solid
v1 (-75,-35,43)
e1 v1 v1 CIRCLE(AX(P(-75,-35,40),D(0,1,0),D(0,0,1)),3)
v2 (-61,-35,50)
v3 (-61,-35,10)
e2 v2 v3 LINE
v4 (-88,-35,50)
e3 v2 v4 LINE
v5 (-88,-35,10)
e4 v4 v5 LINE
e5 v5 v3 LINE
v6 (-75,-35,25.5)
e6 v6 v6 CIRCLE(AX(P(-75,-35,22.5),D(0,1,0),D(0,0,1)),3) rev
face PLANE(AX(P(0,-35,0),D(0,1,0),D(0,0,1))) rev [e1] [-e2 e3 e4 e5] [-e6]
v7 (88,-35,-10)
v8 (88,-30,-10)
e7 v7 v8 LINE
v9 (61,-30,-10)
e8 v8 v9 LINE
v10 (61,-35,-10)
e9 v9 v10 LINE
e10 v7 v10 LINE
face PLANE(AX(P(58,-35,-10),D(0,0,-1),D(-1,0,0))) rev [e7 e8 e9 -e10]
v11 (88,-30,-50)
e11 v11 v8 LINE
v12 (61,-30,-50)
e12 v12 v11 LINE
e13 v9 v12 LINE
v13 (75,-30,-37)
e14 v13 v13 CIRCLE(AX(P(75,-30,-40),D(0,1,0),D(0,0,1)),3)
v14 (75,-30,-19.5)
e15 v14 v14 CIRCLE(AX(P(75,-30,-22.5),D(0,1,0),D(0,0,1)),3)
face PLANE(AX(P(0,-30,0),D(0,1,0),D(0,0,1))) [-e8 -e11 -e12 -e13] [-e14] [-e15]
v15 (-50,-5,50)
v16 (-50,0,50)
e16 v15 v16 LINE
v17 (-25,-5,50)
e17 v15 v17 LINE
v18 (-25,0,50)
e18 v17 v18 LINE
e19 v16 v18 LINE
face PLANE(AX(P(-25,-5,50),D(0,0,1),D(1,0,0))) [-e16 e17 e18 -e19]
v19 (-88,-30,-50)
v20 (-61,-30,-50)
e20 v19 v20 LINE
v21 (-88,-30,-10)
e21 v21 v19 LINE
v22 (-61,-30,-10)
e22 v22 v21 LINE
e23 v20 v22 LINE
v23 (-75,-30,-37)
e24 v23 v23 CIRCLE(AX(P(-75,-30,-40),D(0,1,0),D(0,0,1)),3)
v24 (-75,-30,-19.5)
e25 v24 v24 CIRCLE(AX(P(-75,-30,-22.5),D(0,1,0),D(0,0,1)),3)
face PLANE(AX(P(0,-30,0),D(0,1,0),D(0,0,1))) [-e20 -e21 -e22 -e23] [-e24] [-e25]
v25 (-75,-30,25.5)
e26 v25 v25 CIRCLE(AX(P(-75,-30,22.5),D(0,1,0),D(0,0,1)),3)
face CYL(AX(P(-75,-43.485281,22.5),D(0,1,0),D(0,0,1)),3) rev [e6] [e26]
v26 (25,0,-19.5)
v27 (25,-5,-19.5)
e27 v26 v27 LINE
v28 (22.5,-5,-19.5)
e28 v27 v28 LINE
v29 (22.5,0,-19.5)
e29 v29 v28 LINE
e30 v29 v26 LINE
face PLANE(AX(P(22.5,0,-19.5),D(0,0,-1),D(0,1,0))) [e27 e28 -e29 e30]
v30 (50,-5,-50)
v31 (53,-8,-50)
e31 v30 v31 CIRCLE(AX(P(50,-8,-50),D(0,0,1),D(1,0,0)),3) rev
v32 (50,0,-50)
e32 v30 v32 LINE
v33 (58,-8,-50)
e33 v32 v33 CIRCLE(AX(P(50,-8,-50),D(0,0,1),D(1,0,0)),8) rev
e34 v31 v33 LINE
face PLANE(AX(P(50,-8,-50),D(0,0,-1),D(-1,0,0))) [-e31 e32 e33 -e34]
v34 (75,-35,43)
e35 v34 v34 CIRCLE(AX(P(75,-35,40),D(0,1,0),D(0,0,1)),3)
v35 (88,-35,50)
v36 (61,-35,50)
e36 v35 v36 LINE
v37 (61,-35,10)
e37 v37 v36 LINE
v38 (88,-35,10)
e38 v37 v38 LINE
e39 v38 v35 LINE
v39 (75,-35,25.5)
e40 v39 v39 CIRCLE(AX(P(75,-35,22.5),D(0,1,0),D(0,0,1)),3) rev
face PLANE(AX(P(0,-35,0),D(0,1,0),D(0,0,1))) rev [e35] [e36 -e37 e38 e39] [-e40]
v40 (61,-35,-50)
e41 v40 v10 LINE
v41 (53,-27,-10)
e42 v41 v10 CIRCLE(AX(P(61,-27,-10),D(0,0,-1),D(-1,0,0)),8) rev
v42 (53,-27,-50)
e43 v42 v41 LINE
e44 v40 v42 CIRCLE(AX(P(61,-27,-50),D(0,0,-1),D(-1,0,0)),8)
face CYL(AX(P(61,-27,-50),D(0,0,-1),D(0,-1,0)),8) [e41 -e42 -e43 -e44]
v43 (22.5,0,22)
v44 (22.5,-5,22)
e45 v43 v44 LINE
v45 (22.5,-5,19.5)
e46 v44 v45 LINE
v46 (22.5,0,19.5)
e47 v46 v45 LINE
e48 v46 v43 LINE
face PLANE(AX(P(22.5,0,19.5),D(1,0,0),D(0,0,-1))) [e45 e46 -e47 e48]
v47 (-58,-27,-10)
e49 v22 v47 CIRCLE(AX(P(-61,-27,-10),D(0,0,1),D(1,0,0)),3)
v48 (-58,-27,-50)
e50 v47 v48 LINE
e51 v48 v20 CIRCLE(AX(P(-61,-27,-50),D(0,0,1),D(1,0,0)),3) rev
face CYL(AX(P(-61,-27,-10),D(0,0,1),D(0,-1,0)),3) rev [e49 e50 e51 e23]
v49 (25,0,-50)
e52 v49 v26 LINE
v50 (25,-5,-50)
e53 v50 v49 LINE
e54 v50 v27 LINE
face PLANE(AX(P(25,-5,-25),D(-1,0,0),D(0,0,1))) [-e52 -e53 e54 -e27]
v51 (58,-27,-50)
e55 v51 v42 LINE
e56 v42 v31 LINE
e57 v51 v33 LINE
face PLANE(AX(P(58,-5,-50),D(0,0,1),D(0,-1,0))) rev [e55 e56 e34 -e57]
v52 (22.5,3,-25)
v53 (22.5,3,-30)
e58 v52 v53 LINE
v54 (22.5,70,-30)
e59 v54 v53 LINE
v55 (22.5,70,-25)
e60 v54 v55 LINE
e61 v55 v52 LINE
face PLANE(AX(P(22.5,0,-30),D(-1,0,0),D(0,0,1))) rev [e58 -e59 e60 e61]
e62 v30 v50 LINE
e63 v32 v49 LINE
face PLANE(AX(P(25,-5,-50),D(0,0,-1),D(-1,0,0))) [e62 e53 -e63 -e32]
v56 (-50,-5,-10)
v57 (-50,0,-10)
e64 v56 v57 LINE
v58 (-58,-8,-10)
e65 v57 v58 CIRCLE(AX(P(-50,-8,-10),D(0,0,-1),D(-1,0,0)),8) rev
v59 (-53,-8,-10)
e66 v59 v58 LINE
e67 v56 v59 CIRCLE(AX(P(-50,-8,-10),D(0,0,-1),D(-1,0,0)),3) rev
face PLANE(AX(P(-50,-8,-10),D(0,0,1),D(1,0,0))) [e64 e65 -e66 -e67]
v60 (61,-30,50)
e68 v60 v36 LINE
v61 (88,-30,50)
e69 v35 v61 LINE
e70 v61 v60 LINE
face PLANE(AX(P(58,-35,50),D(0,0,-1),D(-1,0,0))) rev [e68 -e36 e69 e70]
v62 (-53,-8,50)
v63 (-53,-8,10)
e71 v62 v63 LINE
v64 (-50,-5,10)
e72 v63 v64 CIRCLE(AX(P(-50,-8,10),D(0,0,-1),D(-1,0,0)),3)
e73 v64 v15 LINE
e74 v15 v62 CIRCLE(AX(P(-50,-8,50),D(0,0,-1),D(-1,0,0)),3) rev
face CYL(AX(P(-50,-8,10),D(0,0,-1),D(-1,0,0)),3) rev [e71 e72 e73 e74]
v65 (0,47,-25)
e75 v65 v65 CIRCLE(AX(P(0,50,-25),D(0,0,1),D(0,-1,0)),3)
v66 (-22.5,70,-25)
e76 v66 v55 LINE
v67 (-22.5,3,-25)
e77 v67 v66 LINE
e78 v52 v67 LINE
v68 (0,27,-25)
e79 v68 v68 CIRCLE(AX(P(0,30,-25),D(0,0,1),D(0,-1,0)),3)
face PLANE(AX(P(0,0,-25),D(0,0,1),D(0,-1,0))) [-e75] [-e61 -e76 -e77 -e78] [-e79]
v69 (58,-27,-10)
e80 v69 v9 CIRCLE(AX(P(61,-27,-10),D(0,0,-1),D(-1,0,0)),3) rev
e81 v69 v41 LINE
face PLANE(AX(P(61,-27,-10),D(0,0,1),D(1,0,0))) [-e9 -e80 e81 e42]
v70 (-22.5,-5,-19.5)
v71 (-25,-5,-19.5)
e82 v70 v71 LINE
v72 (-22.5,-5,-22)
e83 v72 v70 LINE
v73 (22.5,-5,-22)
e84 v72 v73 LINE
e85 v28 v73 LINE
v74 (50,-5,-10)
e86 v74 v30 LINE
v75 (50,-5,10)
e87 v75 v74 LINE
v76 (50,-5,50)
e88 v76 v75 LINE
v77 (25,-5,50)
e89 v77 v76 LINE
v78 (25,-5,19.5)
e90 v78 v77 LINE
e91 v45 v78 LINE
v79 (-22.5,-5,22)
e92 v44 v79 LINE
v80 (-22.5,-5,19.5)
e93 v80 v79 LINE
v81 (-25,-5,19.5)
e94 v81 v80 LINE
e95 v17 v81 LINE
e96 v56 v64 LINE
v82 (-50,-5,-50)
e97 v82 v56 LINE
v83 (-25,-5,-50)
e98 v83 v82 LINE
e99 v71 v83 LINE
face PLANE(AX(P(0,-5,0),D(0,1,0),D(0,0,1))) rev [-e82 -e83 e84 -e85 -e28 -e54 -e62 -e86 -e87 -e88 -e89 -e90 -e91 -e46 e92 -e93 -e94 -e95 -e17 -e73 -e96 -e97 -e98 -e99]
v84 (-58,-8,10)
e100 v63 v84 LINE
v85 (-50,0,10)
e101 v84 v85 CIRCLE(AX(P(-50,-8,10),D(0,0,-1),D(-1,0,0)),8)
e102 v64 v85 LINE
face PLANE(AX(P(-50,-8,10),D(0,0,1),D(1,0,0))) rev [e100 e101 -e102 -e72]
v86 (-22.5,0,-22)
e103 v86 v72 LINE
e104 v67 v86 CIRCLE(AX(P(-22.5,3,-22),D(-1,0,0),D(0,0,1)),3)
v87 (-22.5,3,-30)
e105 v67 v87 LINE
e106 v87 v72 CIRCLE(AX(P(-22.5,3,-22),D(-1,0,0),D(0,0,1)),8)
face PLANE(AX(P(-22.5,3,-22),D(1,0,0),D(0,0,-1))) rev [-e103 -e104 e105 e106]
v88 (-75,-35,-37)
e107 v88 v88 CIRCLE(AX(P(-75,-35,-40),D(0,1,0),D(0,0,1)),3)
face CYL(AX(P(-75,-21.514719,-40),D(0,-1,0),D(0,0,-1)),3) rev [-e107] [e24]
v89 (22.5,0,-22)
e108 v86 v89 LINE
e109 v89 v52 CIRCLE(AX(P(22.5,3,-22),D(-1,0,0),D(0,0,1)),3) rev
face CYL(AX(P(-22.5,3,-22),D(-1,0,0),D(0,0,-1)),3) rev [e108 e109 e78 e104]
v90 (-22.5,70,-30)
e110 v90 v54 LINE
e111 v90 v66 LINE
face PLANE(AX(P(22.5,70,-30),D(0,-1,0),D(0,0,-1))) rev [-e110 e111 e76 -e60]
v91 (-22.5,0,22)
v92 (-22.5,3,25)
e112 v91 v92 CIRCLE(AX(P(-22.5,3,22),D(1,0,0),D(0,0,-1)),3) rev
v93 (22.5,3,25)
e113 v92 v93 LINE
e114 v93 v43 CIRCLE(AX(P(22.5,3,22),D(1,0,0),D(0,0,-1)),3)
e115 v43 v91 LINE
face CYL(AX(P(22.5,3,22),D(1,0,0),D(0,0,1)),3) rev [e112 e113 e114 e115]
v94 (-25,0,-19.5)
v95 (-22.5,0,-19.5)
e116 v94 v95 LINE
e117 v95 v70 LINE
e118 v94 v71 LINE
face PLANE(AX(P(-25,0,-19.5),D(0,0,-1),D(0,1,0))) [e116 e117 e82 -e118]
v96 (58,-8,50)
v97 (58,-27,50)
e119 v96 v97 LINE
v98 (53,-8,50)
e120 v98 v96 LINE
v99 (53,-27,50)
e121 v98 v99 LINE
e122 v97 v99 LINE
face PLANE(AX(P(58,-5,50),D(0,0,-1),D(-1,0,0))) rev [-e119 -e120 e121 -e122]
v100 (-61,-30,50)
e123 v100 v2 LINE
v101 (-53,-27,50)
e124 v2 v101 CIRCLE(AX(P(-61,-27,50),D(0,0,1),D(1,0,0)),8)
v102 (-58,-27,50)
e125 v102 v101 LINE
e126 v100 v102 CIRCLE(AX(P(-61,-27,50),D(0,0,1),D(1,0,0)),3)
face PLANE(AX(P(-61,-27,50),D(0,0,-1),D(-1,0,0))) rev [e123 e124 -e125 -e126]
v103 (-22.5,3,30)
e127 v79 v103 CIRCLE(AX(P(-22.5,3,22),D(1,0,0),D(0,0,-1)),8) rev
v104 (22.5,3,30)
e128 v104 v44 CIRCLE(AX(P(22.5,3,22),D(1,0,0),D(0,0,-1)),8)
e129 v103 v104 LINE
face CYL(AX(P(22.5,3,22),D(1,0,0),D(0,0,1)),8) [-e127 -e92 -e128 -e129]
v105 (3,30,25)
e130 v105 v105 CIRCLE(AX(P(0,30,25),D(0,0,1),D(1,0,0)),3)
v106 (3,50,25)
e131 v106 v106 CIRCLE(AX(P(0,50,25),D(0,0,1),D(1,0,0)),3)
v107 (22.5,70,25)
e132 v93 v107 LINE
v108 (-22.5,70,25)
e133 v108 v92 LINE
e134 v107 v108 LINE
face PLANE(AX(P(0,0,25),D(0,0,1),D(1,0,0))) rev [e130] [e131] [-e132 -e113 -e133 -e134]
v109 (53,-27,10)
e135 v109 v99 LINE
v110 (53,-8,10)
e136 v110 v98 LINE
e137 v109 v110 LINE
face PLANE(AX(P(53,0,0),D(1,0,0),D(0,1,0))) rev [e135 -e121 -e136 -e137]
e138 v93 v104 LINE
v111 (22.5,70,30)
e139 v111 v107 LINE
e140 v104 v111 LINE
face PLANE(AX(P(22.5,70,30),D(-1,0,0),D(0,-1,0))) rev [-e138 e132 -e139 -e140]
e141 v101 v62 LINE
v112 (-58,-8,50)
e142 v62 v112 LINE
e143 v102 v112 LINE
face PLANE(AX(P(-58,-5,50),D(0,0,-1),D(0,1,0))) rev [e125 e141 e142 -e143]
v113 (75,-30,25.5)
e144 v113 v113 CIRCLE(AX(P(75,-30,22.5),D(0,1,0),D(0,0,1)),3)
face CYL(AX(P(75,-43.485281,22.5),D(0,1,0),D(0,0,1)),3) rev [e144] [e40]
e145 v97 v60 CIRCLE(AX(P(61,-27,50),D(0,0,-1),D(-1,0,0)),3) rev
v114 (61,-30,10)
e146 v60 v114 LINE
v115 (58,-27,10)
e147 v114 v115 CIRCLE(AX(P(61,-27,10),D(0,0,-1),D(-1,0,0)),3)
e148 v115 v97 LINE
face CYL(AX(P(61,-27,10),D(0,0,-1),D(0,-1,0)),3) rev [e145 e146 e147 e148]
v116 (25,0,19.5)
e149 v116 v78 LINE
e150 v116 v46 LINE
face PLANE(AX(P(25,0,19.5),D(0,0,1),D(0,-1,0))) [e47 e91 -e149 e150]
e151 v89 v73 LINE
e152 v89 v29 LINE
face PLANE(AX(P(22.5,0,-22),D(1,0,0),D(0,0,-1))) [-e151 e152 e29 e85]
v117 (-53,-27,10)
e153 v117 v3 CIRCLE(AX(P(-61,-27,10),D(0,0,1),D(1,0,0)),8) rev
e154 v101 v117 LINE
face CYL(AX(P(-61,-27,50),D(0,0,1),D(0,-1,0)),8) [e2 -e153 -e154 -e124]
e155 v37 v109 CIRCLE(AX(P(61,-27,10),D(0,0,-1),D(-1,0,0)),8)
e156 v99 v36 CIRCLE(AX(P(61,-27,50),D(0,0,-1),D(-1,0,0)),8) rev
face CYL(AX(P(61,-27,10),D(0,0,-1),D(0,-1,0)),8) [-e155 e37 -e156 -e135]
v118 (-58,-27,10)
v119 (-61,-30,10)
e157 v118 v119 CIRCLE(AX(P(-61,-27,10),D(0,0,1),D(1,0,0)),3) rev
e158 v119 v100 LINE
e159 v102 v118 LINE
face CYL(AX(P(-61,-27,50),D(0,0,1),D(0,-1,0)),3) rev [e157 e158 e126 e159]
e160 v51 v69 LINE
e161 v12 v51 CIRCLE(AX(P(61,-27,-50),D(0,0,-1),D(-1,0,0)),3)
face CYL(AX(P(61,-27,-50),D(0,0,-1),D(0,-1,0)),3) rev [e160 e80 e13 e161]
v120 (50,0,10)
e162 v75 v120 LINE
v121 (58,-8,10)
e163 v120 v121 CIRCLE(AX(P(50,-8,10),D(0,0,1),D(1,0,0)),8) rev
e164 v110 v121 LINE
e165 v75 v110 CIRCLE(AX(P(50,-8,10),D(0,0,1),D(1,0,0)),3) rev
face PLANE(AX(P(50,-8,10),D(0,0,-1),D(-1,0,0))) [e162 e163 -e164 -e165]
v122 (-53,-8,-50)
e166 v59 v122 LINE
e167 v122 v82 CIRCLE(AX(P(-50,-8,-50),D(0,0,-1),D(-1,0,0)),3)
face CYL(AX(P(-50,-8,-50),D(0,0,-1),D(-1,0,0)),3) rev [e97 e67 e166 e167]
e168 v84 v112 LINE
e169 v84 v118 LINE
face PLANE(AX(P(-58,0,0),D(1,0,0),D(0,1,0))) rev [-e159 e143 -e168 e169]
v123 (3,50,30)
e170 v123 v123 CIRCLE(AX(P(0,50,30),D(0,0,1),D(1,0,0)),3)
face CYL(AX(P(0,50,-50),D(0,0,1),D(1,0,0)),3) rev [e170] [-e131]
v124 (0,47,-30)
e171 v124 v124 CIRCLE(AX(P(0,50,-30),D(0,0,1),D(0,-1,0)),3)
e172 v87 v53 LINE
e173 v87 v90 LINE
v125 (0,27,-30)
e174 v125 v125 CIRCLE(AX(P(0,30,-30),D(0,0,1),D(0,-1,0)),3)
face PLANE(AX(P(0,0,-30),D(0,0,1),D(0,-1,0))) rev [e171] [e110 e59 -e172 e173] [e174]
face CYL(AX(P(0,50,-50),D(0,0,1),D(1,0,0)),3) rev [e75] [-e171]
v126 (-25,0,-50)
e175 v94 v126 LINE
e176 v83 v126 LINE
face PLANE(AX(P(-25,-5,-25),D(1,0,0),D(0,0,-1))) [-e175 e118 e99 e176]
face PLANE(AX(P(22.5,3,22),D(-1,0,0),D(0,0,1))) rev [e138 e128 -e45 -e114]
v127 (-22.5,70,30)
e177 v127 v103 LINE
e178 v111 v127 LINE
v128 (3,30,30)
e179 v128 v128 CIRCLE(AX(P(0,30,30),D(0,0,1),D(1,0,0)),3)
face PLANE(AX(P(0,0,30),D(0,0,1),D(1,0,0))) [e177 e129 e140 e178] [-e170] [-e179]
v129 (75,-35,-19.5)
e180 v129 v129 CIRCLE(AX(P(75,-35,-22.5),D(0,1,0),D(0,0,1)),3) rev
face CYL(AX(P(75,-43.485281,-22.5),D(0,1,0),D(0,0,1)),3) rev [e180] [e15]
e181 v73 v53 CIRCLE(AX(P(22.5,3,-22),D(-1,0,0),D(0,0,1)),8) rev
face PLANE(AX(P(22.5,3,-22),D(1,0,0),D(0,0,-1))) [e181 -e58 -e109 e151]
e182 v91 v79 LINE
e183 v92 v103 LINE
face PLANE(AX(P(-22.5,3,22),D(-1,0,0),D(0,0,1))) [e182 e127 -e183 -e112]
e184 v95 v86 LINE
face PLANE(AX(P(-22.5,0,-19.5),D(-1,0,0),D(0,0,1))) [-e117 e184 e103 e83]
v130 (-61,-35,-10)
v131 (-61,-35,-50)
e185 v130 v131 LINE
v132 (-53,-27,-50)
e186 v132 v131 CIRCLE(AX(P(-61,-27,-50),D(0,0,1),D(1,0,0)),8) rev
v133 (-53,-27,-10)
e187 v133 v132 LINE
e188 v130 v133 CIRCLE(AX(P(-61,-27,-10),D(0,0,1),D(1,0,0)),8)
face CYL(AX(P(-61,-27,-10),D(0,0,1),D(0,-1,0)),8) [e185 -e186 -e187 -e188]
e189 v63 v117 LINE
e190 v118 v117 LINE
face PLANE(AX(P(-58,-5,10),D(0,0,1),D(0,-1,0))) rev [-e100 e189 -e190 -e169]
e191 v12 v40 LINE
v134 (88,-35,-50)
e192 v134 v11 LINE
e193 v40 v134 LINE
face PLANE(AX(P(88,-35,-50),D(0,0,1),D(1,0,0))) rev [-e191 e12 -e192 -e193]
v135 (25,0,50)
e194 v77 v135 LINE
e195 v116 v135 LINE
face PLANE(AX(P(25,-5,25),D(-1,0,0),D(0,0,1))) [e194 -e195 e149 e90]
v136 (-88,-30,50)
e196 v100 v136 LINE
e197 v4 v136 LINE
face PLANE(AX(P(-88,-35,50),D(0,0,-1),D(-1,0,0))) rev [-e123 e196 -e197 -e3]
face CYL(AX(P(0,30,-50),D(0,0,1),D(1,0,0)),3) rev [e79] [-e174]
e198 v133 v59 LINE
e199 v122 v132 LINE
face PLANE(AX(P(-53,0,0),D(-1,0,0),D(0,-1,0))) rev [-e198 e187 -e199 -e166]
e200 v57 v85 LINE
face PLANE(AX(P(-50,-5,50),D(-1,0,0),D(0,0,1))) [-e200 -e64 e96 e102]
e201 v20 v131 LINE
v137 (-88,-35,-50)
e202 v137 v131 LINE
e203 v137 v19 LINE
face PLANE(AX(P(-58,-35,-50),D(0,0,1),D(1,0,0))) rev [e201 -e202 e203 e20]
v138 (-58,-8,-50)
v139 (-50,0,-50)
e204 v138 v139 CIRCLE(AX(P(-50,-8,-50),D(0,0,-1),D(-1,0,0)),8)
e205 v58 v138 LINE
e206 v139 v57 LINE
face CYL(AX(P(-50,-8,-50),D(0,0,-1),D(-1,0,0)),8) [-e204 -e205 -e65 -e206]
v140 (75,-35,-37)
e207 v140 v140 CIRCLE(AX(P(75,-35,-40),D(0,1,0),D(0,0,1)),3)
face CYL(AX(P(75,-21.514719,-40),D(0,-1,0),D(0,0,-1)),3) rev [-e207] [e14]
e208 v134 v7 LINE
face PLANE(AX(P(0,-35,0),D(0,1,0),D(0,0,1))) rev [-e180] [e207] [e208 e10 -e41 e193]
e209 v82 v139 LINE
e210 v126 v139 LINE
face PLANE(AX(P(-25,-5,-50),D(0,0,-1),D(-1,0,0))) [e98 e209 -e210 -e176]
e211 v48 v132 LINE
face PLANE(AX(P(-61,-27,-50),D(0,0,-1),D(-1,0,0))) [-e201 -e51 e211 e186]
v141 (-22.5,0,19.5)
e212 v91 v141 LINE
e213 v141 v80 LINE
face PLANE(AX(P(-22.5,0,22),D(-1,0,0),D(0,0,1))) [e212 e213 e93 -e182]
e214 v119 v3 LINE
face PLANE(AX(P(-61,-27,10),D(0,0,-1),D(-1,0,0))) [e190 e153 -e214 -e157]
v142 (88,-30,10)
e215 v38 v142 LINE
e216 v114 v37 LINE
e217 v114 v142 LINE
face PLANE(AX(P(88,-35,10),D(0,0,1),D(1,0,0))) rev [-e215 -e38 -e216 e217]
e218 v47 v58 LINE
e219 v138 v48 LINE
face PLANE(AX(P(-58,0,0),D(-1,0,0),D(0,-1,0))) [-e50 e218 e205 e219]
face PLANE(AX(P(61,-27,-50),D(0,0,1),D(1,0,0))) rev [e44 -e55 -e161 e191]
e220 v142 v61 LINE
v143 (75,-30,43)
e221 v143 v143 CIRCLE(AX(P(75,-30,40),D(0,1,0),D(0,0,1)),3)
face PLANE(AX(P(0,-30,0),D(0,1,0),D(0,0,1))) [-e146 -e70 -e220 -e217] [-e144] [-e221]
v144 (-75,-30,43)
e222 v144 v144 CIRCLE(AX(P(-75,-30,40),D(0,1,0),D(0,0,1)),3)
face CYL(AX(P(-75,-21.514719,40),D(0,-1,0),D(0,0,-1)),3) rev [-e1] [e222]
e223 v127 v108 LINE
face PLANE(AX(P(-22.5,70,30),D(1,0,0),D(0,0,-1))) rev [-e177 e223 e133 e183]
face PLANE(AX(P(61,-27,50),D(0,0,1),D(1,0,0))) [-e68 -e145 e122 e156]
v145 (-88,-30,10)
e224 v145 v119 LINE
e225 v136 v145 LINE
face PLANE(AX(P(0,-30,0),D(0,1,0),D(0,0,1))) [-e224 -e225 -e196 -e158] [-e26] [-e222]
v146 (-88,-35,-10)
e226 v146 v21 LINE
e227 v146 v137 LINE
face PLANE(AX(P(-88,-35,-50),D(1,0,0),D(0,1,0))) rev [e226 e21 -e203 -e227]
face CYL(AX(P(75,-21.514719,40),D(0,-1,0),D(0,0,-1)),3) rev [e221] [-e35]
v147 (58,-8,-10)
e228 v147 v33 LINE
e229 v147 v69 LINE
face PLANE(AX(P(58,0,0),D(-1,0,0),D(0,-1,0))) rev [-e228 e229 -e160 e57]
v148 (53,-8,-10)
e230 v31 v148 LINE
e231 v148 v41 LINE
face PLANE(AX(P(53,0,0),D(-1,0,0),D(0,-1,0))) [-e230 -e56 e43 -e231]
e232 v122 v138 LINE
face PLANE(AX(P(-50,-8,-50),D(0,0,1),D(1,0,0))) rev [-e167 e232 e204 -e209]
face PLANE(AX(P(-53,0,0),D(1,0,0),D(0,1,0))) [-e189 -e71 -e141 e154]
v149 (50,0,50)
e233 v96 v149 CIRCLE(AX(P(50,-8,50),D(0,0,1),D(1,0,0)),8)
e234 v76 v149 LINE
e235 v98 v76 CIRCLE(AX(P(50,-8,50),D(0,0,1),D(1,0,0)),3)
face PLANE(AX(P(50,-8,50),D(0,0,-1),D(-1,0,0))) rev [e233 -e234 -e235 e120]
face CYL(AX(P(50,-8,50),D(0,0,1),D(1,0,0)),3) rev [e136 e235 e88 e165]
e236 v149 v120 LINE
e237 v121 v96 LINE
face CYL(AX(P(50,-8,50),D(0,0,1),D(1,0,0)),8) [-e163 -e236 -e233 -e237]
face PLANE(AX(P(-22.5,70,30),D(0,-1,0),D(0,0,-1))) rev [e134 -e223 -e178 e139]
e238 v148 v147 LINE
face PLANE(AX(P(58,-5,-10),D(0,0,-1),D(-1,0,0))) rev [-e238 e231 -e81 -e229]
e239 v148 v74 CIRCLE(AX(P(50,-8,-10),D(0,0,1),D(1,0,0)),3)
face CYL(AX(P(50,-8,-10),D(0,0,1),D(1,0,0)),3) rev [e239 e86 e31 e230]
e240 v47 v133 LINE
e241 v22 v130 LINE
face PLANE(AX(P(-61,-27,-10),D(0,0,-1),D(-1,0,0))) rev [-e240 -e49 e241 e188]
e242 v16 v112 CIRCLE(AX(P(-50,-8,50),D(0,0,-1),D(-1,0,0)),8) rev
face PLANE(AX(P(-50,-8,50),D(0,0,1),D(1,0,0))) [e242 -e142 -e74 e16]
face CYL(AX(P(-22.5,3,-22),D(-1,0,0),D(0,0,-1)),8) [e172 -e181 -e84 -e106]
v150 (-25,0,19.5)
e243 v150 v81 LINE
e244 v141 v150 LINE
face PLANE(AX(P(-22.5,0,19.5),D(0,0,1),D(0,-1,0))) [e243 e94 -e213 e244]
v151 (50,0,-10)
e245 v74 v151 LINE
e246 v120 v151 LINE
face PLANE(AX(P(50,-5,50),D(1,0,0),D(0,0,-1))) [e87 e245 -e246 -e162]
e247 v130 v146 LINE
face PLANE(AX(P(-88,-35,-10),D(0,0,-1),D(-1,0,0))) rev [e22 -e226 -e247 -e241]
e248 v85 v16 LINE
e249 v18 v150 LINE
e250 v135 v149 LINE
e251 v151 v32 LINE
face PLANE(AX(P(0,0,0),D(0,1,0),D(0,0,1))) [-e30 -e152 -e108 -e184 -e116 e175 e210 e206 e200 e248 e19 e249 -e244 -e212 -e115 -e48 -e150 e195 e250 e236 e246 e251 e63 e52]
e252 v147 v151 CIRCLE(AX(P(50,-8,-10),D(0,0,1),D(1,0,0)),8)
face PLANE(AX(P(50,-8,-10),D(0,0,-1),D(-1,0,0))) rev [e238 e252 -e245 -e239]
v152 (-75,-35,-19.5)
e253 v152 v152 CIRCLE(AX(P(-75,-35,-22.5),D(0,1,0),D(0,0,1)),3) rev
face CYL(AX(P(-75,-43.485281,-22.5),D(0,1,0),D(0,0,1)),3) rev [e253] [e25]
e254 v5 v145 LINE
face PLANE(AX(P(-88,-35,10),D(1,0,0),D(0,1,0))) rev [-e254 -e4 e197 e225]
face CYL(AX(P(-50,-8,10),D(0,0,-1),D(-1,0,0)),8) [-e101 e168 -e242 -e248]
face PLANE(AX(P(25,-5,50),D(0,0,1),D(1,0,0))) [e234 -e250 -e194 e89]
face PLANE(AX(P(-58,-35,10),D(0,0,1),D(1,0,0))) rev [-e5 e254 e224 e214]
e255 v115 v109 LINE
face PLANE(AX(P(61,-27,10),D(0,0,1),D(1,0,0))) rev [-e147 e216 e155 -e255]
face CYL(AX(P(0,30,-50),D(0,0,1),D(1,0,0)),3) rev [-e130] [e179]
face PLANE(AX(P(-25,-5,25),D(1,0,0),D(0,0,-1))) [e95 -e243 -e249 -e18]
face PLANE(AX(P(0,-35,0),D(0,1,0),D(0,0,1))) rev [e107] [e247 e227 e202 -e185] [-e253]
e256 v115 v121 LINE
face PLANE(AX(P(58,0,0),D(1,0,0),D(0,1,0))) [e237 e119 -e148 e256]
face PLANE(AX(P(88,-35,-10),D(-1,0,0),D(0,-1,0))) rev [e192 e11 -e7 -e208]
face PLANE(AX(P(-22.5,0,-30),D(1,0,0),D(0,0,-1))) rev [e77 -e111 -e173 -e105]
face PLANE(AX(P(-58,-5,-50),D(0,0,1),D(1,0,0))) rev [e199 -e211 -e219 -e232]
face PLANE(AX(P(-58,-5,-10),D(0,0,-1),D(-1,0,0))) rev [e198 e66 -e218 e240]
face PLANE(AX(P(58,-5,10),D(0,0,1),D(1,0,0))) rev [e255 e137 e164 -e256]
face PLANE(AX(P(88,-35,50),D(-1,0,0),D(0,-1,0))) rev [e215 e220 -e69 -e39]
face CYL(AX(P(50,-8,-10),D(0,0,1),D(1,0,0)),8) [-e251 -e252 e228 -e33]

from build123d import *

# Parameters (mm, degrees)
SM_BASE_FLANGE_1_DEPTH            = 5
SM_EDGE_FLANGE_1_STRIP_W          = 26
SM_EDGE_FLANGE_1_STRIP_H          = 5
SM_EDGE_FLANGE_1_STRIP_CUT_DEPTH  = 45
SM_EDGE_FLANGE_1_RELIEF_W         = 28.5
SM_EDGE_FLANGE_1_RELIEF_H         = 2.5
SM_EDGE_FLANGE_1_RELIEF_CUT_DEPTH = 5
SM_EDGE_FLANGE_1_DEPTH            = 45
SM_EDGE_FLANGE_2_STRIP_W          = 26
SM_EDGE_FLANGE_2_STRIP_H          = 5
SM_EDGE_FLANGE_2_STRIP_CUT_DEPTH  = 45
SM_EDGE_FLANGE_2_RELIEF_W         = 28.5
SM_EDGE_FLANGE_2_RELIEF_H         = 2.5
SM_EDGE_FLANGE_2_RELIEF_CUT_DEPTH = 5
SM_EDGE_FLANGE_2_DEPTH            = 45
SM_EDGE_FLANGE_14_DEPTH           = 40
SM_EDGE_FLANGE_15_DEPTH           = 40
SM_EDGE_FLANGE_16_DEPTH           = 40
SM_EDGE_FLANGE_17_DEPTH           = 40
SM_EDGE_FLANGE_18_STRIP_W         = 26
SM_EDGE_FLANGE_18_STRIP_H         = 5
SM_EDGE_FLANGE_18_STRIP_CUT_DEPTH = 40
SM_EDGE_FLANGE_18_DEPTH           = 40
SM_EDGE_FLANGE_19_STRIP_W         = 26
SM_EDGE_FLANGE_19_STRIP_H         = 5
SM_EDGE_FLANGE_19_STRIP_CUT_DEPTH = 40
SM_EDGE_FLANGE_19_DEPTH           = 40
SM_EDGE_FLANGE_20_STRIP_W         = 26
SM_EDGE_FLANGE_20_STRIP_H         = 5
SM_EDGE_FLANGE_20_STRIP_CUT_DEPTH = 40
SM_EDGE_FLANGE_20_DEPTH           = 40
SM_EDGE_FLANGE_21_STRIP_W         = 26
SM_EDGE_FLANGE_21_STRIP_H         = 5
SM_EDGE_FLANGE_21_STRIP_CUT_DEPTH = 40
SM_EDGE_FLANGE_21_DEPTH           = 40
CUT_EXTRUDE_START                 = -35
SKETCH_80_R                       = 3
CUT_EXTRUDE_1_DEPTH               = 5
CUT_EXTRUDE_3_DEPTH               = 124.060960503
CUT_EXTRUDE_3_DEPTH_BACK          = 124.060960503
SKETCH_83_R                       = 3
CUT_EXTRUDE_START_2               = -30
SKETCH_84_R                       = 3
CUT_EXTRUDE_5_DEPTH               = 5


# Sheet-metal steps are written as plain solids
with BuildPart() as part:
    # Sketch 1 → 基体-法兰1 (new body)
    with BuildSketch(Plane(origin=(0, 0, 0), x_dir=(1, 0, 0), z_dir=(0, 1, 0))):
        Polygon((-25, -25), (-25, -50), (-50, -50), (-50, 50), (-25, 50), (-25, 25), (25, 25), (25, 50), (50, 50), (50, -50), (25, -50), (25, -25), align=None)
    extrude(amount=-SM_BASE_FLANGE_1_DEPTH)

    # 边线-法兰1 strip (across the edge) → 边线-法兰1 strip cut (cut)
    with BuildSketch(Plane(origin=(22.5, 0, -25), x_dir=(0, 0, 1), z_dir=(-1, 0, 0))):
        with Locations((-10, -2.5)):
            Rectangle(SM_EDGE_FLANGE_1_STRIP_W, SM_EDGE_FLANGE_1_STRIP_H)
    extrude(amount=SM_EDGE_FLANGE_1_STRIP_CUT_DEPTH, mode=Mode.SUBTRACT)

    # 边线-法兰1 relief (on the sheet) → 边线-法兰1 relief cut (cut)
    with BuildSketch(Plane(origin=(22.5, 0, -22), x_dir=(0, 0, 1), z_dir=(0, 1, 0))):
        with Locations((-11.75, 1.25)):
            Rectangle(SM_EDGE_FLANGE_1_RELIEF_W, SM_EDGE_FLANGE_1_RELIEF_H)
        with Locations((-11.75, -46.25)):
            Rectangle(SM_EDGE_FLANGE_1_RELIEF_W, SM_EDGE_FLANGE_1_RELIEF_H)
    extrude(amount=-SM_EDGE_FLANGE_1_RELIEF_CUT_DEPTH, mode=Mode.SUBTRACT)

    # 边线-法兰1 section (across the edge) → 边线-法兰1 (add)
    with BuildSketch(Plane(origin=(22.5, 0, -25), x_dir=(0, 0, 1), z_dir=(-1, 0, 0))):
        with BuildLine():
            Line((-5, 3), (-5, 70))
            Line((-5, 70), (0, 70))
            Line((0, 70), (0, 3))
            ThreePointArc((0, 3), (0.878679656, 0.878679656), (3, 0))
            Line((3, 0), (3, -5))
            ThreePointArc((3, -5), (-2.656854249, -2.656854249), (-5, 3))
        make_face()
    extrude(amount=SM_EDGE_FLANGE_1_DEPTH)

    # 边线-法兰2 strip (across the edge) → 边线-法兰2 strip cut (cut)
    with BuildSketch(Plane(origin=(-22.5, 0, 25), x_dir=(0, 0, -1), z_dir=(1, 0, 0))):
        with Locations((-10, -2.5)):
            Rectangle(SM_EDGE_FLANGE_2_STRIP_W, SM_EDGE_FLANGE_2_STRIP_H)
    extrude(amount=SM_EDGE_FLANGE_2_STRIP_CUT_DEPTH, mode=Mode.SUBTRACT)

    # 边线-法兰2 relief (on the sheet) → 边线-法兰2 relief cut (cut)
    with BuildSketch(Plane(origin=(-22.5, 0, 22), x_dir=(0, 0, -1), z_dir=(0, 1, 0))):
        with Locations((-11.75, 1.25)):
            Rectangle(SM_EDGE_FLANGE_2_RELIEF_W, SM_EDGE_FLANGE_2_RELIEF_H)
        with Locations((-11.75, -46.25)):
            Rectangle(SM_EDGE_FLANGE_2_RELIEF_W, SM_EDGE_FLANGE_2_RELIEF_H)
    extrude(amount=-SM_EDGE_FLANGE_2_RELIEF_CUT_DEPTH, mode=Mode.SUBTRACT)

    # 边线-法兰2 section (across the edge) → 边线-法兰2 (add)
    with BuildSketch(Plane(origin=(-22.5, 0, 25), x_dir=(0, 0, -1), z_dir=(1, 0, 0))):
        with BuildLine():
            Line((-5, 3), (-5, 70))
            Line((-5, 70), (0, 70))
            Line((0, 70), (0, 3))
            ThreePointArc((0, 3), (0.878679656, 0.878679656), (3, 0))
            Line((3, 0), (3, -5))
            ThreePointArc((3, -5), (-2.656854249, -2.656854249), (-5, 3))
        make_face()
    extrude(amount=SM_EDGE_FLANGE_2_DEPTH)

    # 边线-法兰14 section (across the edge) → 边线-法兰14 (add)
    with BuildSketch(Plane(origin=(53, -5, 10), x_dir=(-1, 0, 0), z_dir=(0, 0, 1))):
        with BuildLine():
            Line((-5, 3), (-5, 30))
            Line((-5, 30), (0, 30))
            Line((0, 30), (0, 3))
            ThreePointArc((0, 3), (0.878679656, 0.878679656), (3, 0))
            Line((3, 0), (3, -5))
            ThreePointArc((3, -5), (-2.656854249, -2.656854249), (-5, 3))
        make_face()
    extrude(amount=SM_EDGE_FLANGE_14_DEPTH)

    # 边线-法兰15 section (across the edge) → 边线-法兰15 (add)
    with BuildSketch(Plane(origin=(53, -5, -50), x_dir=(-1, 0, 0), z_dir=(0, 0, 1))):
        with BuildLine():
            Line((-5, 3), (-5, 30))
            Line((-5, 30), (0, 30))
            Line((0, 30), (0, 3))
            ThreePointArc((0, 3), (0.878679656, 0.878679656), (3, 0))
            Line((3, 0), (3, -5))
            ThreePointArc((3, -5), (-2.656854249, -2.656854249), (-5, 3))
        make_face()
    extrude(amount=SM_EDGE_FLANGE_15_DEPTH)

    # 边线-法兰16 section (across the edge) → 边线-法兰16 (add)
    with BuildSketch(Plane(origin=(-53, -5, -10), x_dir=(1, 0, 0), z_dir=(0, 0, -1))):
        with BuildLine():
            Line((-5, 3), (-5, 30))
            Line((-5, 30), (0, 30))
            Line((0, 30), (0, 3))
            ThreePointArc((0, 3), (0.878679656, 0.878679656), (3, 0))
            Line((3, 0), (3, -5))
            ThreePointArc((3, -5), (-2.656854249, -2.656854249), (-5, 3))
        make_face()
    extrude(amount=SM_EDGE_FLANGE_16_DEPTH)

    # 边线-法兰17 section (across the edge) → 边线-法兰17 (add)
    with BuildSketch(Plane(origin=(-53, -5, 50), x_dir=(1, 0, 0), z_dir=(0, 0, -1))):
        with BuildLine():
            Line((-5, 3), (-5, 30))
            Line((-5, 30), (0, 30))
            Line((0, 30), (0, 3))
            ThreePointArc((0, 3), (0.878679656, 0.878679656), (3, 0))
            Line((3, 0), (3, -5))
            ThreePointArc((3, -5), (-2.656854249, -2.656854249), (-5, 3))
        make_face()
    extrude(amount=SM_EDGE_FLANGE_17_DEPTH)

    # 边线-法兰18 strip (across the edge) → 边线-法兰18 strip cut (cut)
    with BuildSketch(Plane(origin=(-58, -35, -50), x_dir=(0, 1, 0), z_dir=(0, 0, 1))):
        with Locations((-5, -2.5)):
            Rectangle(SM_EDGE_FLANGE_18_STRIP_W, SM_EDGE_FLANGE_18_STRIP_H)
    extrude(amount=SM_EDGE_FLANGE_18_STRIP_CUT_DEPTH, mode=Mode.SUBTRACT)

    # 边线-法兰18 section (across the edge) → 边线-法兰18 (add)
    with BuildSketch(Plane(origin=(-58, -35, -50), x_dir=(0, 1, 0), z_dir=(0, 0, 1))):
        with BuildLine():
            Line((0, 3), (0, 30))
            Line((0, 30), (5, 30))
            Line((5, 30), (5, 3))
            ThreePointArc((5, 3), (5.878679656, 0.878679656), (8, 0))
            Line((8, 0), (8, -5))
            ThreePointArc((8, -5), (2.343145751, -2.656854249), (0, 3))
        make_face()
    extrude(amount=SM_EDGE_FLANGE_18_DEPTH)

    # 边线-法兰19 strip (across the edge) → 边线-法兰19 strip cut (cut)
    with BuildSketch(Plane(origin=(-58, -35, 10), x_dir=(0, 1, 0), z_dir=(0, 0, 1))):
        with Locations((-5, -2.5)):
            Rectangle(SM_EDGE_FLANGE_19_STRIP_W, SM_EDGE_FLANGE_19_STRIP_H)
    extrude(amount=SM_EDGE_FLANGE_19_STRIP_CUT_DEPTH, mode=Mode.SUBTRACT)

    # 边线-法兰19 section (across the edge) → 边线-法兰19 (add)
    with BuildSketch(Plane(origin=(-58, -35, 10), x_dir=(0, 1, 0), z_dir=(0, 0, 1))):
        with BuildLine():
            Line((0, 3), (0, 30))
            Line((0, 30), (5, 30))
            Line((5, 30), (5, 3))
            ThreePointArc((5, 3), (5.878679656, 0.878679656), (8, 0))
            Line((8, 0), (8, -5))
            ThreePointArc((8, -5), (2.343145751, -2.656854249), (0, 3))
        make_face()
    extrude(amount=SM_EDGE_FLANGE_19_DEPTH)

    # 边线-法兰20 strip (across the edge) → 边线-法兰20 strip cut (cut)
    with BuildSketch(Plane(origin=(58, -35, 50), x_dir=(0, 1, 0), z_dir=(0, 0, -1))):
        with Locations((-5, -2.5)):
            Rectangle(SM_EDGE_FLANGE_20_STRIP_W, SM_EDGE_FLANGE_20_STRIP_H)
    extrude(amount=SM_EDGE_FLANGE_20_STRIP_CUT_DEPTH, mode=Mode.SUBTRACT)

    # 边线-法兰20 section (across the edge) → 边线-法兰20 (add)
    with BuildSketch(Plane(origin=(58, -35, 50), x_dir=(0, 1, 0), z_dir=(0, 0, -1))):
        with BuildLine():
            Line((0, 3), (0, 30))
            Line((0, 30), (5, 30))
            Line((5, 30), (5, 3))
            ThreePointArc((5, 3), (5.878679656, 0.878679656), (8, 0))
            Line((8, 0), (8, -5))
            ThreePointArc((8, -5), (2.343145751, -2.656854249), (0, 3))
        make_face()
    extrude(amount=SM_EDGE_FLANGE_20_DEPTH)

    # 边线-法兰21 strip (across the edge) → 边线-法兰21 strip cut (cut)
    with BuildSketch(Plane(origin=(58, -35, -10), x_dir=(0, 1, 0), z_dir=(0, 0, -1))):
        with Locations((-5, -2.5)):
            Rectangle(SM_EDGE_FLANGE_21_STRIP_W, SM_EDGE_FLANGE_21_STRIP_H)
    extrude(amount=SM_EDGE_FLANGE_21_STRIP_CUT_DEPTH, mode=Mode.SUBTRACT)

    # 边线-法兰21 section (across the edge) → 边线-法兰21 (add)
    with BuildSketch(Plane(origin=(58, -35, -10), x_dir=(0, 1, 0), z_dir=(0, 0, -1))):
        with BuildLine():
            Line((0, 3), (0, 30))
            Line((0, 30), (5, 30))
            Line((5, 30), (5, 3))
            ThreePointArc((5, 3), (5.878679656, 0.878679656), (8, 0))
            Line((8, 0), (8, -5))
            ThreePointArc((8, -5), (2.343145751, -2.656854249), (0, 3))
        make_face()
    extrude(amount=SM_EDGE_FLANGE_21_DEPTH)

    # 草图80 → 切除-拉伸1 (cut)
    with BuildSketch(Plane(origin=(0, 0, 0), x_dir=(1, 0, 0), z_dir=(0, 1, 0)).offset(CUT_EXTRUDE_START)):
        with Locations(Location((-75, 40, 0), (0, 0, 270))):
            Circle(SKETCH_80_R)
        with Locations(Location((75, 40, 0), (0, 0, 270))):
            Circle(SKETCH_80_R)
        with Locations(Location((-75, -40, 0), (0, 0, 270))):
            Circle(SKETCH_80_R)
        with Locations(Location((75, -40, 0), (0, 0, 270))):
            Circle(SKETCH_80_R)
    extrude(amount=CUT_EXTRUDE_1_DEPTH, mode=Mode.SUBTRACT)

    # 草图83 → 切除-拉伸3 (cut, two sides: drawn at the far end of the back side and taken through both)
    with BuildSketch(Plane.XY.offset(-CUT_EXTRUDE_3_DEPTH_BACK)):
        with Locations((0, 50)):
            Circle(SKETCH_83_R)
        with Locations((0, 30)):
            Circle(SKETCH_83_R)
    extrude(amount=CUT_EXTRUDE_3_DEPTH + CUT_EXTRUDE_3_DEPTH_BACK, mode=Mode.SUBTRACT)

    # 草图84 → 切除-拉伸5 (cut)
    with BuildSketch(Plane(origin=(0, 0, 0), x_dir=(1, 0, 0), z_dir=(0, 1, 0)).offset(CUT_EXTRUDE_START_2)):
        with Locations(Location((75, 22.5, 0), (0, 0, 270))):
            Circle(SKETCH_84_R)
        with Locations(Location((75, -22.5, 0), (0, 0, 270))):
            Circle(SKETCH_84_R)
        with Locations(Location((-75, -22.5, 0), (0, 0, 270))):
            Circle(SKETCH_84_R)
        with Locations(Location((-75, 22.5, 0), (0, 0, 270))):
            Circle(SKETCH_84_R)
    extrude(amount=-CUT_EXTRUDE_5_DEPTH, mode=Mode.SUBTRACT)


solid = part.part
